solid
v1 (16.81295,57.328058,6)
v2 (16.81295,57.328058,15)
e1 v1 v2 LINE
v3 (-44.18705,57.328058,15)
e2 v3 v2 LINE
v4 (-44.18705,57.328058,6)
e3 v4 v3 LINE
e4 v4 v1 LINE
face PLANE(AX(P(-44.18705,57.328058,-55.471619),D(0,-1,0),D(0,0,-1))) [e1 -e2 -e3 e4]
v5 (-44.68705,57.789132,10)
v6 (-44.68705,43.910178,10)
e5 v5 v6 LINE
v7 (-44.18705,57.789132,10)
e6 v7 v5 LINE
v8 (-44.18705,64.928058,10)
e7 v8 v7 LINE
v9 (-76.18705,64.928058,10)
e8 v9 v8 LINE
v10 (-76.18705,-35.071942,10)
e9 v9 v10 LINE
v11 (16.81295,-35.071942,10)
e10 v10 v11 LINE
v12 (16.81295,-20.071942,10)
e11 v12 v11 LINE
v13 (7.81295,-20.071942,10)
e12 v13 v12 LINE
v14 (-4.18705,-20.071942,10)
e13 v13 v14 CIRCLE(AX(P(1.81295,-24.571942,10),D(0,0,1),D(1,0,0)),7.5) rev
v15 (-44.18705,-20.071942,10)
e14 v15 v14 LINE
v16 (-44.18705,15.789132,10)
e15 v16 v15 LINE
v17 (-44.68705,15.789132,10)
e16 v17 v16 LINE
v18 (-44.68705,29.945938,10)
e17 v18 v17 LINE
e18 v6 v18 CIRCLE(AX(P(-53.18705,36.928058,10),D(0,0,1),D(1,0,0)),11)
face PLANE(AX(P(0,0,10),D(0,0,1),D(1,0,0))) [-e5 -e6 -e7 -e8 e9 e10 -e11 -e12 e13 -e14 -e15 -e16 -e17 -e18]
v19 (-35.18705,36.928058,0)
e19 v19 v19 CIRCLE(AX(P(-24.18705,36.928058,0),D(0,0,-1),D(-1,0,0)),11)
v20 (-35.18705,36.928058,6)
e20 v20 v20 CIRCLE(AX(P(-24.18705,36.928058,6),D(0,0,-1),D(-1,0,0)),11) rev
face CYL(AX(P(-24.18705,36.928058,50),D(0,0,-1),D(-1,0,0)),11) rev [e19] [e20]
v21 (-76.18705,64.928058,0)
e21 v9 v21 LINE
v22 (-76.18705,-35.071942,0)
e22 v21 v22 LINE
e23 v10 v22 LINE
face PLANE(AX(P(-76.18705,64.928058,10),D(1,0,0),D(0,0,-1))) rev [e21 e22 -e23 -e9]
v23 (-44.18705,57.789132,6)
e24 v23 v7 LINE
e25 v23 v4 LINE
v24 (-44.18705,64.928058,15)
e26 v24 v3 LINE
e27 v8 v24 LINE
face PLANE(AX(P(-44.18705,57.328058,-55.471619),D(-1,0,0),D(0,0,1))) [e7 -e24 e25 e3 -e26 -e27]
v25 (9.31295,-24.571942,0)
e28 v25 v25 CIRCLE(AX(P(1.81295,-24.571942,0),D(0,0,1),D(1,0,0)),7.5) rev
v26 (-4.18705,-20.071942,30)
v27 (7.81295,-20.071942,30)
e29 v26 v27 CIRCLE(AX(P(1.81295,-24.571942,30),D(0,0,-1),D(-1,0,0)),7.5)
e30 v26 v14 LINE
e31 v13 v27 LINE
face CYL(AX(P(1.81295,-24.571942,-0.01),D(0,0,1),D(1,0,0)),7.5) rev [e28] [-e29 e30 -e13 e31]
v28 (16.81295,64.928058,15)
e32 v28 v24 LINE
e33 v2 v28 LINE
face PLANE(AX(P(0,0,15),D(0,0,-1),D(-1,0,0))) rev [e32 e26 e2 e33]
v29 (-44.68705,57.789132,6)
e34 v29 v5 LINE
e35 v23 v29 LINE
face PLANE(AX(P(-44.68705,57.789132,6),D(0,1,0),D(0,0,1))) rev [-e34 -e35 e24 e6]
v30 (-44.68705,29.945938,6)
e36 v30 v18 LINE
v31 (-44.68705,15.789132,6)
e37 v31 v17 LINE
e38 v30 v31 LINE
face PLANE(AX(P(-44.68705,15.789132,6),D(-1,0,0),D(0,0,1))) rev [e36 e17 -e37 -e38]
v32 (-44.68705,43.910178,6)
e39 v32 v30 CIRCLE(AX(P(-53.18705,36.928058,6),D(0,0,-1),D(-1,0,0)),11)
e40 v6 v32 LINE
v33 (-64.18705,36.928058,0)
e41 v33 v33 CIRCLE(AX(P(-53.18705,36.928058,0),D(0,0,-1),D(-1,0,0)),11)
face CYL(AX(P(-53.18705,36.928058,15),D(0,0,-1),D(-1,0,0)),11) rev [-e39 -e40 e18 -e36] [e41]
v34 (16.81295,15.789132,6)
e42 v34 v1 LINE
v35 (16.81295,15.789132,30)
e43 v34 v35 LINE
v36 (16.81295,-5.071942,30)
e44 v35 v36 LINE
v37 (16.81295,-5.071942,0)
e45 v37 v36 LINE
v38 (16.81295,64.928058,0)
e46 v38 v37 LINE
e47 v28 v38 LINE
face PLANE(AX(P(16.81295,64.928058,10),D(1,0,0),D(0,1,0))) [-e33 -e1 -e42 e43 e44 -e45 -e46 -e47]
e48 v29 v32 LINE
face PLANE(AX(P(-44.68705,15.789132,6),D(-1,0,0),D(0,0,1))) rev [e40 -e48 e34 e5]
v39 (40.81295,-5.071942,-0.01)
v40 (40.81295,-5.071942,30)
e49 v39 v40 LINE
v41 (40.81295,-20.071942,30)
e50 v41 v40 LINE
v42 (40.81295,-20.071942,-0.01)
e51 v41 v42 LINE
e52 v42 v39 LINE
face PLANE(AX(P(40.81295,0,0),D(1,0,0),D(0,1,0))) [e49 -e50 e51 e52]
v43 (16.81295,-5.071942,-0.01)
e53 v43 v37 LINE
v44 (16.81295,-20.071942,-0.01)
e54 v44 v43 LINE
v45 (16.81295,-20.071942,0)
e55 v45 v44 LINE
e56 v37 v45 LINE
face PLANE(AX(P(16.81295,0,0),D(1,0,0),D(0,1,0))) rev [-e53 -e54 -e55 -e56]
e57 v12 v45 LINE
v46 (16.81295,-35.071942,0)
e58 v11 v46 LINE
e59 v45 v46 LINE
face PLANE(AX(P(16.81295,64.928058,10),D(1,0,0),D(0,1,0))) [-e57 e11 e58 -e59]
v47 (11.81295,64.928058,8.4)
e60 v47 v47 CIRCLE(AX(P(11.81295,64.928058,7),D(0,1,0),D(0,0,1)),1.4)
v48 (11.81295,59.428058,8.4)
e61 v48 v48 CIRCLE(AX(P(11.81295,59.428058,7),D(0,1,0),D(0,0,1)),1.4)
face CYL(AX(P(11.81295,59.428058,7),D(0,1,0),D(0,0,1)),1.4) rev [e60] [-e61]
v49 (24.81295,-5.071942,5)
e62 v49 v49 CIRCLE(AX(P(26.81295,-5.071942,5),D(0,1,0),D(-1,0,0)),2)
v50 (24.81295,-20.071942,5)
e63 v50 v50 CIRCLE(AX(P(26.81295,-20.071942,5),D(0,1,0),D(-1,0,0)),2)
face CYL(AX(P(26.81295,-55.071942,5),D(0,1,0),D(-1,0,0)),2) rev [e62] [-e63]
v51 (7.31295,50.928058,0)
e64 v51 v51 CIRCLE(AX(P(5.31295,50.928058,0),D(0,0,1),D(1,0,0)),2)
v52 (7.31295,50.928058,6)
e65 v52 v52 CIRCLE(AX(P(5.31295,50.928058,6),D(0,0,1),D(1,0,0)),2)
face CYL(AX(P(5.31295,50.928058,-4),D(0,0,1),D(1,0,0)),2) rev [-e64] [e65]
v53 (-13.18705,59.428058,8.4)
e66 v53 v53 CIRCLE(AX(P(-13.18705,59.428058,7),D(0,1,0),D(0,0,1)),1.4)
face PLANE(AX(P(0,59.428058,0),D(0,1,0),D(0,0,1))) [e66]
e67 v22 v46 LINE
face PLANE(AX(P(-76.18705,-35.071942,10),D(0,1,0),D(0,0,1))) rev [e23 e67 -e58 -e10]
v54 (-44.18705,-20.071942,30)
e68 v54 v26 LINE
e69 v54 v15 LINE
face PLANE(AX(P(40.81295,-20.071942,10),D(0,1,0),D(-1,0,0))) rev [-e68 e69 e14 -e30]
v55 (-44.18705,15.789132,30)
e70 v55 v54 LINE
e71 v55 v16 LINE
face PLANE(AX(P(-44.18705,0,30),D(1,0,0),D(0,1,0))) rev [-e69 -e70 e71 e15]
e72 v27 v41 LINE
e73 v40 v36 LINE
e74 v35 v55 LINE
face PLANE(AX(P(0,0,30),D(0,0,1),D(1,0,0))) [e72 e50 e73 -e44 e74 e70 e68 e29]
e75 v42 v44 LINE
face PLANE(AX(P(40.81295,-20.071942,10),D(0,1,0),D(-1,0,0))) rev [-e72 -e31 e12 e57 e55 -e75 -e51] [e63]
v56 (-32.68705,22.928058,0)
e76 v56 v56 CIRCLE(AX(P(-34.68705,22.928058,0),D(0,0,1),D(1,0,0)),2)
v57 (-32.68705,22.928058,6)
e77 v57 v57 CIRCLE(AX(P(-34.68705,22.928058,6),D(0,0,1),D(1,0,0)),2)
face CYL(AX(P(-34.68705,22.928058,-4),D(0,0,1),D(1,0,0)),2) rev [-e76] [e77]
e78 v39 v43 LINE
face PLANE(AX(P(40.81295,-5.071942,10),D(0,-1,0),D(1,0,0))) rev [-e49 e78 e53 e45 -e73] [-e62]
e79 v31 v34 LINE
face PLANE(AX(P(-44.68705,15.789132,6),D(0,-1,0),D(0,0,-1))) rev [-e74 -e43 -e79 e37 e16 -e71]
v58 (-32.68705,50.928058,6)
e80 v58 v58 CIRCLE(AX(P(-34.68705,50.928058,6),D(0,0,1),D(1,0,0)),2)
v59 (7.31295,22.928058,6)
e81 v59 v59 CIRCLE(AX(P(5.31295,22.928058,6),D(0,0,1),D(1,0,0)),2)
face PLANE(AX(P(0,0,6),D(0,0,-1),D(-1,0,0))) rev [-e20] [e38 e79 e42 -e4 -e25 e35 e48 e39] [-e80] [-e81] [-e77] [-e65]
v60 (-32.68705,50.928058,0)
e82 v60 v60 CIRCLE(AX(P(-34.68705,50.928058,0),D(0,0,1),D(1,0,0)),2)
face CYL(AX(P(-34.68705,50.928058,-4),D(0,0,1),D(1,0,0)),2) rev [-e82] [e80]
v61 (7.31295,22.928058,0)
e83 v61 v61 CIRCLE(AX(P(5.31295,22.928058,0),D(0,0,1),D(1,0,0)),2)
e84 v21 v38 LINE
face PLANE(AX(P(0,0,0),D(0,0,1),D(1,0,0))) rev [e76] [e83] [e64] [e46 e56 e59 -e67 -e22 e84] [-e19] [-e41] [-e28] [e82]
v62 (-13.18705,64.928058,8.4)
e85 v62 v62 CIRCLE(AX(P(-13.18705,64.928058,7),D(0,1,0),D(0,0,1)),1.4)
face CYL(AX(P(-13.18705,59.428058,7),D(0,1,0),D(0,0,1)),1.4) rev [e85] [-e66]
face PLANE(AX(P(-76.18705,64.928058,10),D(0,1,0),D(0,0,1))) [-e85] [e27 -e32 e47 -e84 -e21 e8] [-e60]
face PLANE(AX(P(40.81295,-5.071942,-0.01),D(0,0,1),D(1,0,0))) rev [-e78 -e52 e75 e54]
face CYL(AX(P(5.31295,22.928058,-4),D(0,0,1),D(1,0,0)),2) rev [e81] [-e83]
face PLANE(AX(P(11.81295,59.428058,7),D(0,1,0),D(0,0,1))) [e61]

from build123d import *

# Parameters (mm, degrees)
SKETCH1_W                = 93
SKETCH1_H                = 100
BOSS_EXTRUDE2_DEPTH      = 10
SKETCH4_W                = 10.01
SKETCH4_H                = 15
BOSS_EXTRUDE4_DEPTH      = 24
SKETCH5_R                = 2
CUT_EXTRUDE1_DEPTH       = 50
SKETCH7_R                = 11
CUT_EXTRUDE3_DEPTH       = 50
SKETCH14_W               = 61.5
SKETCH14_H               = 42
CUT_EXTRUDE8_DEPTH       = 4
BOSS_EXTRUDE5_START      = -4
SKETCH16_W               = 61
SKETCH16_H               = 7.6
BOSS_EXTRUDE5_DEPTH      = 9
BOSS_EXTRUDE6_DEPTH      = 20
SKETCH19_R               = 11
CUT_EXTRUDE11_DEPTH      = 15
SKETCH20_R               = 2
CUT_EXTRUDE12_DEPTH      = 10
SKETCH8_R                = 1.4
CUT_EXTRUDE4_DEPTH       = 5.5
CUT_EXTRUDE13_DEPTH      = 103.078985596
CUT_EXTRUDE13_DEPTH_BACK = 103.078985596
SKETCH6_R                = 7.5


# Read off the part's stored shape, not the designer's step: Boss-Extrude6
with BuildPart() as part:
    # Sketch1 → Boss-Extrude2 (new body)
    with BuildSketch(Plane.XY):
        with Locations((-29.68705036, 14.928057554)):
            Rectangle(SKETCH1_W, SKETCH1_H)
    extrude(amount=BOSS_EXTRUDE2_DEPTH)

    # Sketch4 → Boss-Extrude4 (add)
    with BuildSketch(Plane(origin=(16.81294964, 0, 0), x_dir=(0, 0, -1), z_dir=(1, 0, 0))):
        with Locations((-4.995, -12.571942446)):
            Rectangle(SKETCH4_W, SKETCH4_H)
    extrude(amount=BOSS_EXTRUDE4_DEPTH)

    # Sketch5 → Cut-Extrude1 (cut)
    with BuildSketch(Plane(origin=(0, -5.071942446, 0), x_dir=(1, 0, 0), z_dir=(0, 1, 0))):
        with Locations(Location((26.81294964, -5, 0), (0, 0, 180))):
            Circle(SKETCH5_R)
    extrude(amount=-CUT_EXTRUDE1_DEPTH, mode=Mode.SUBTRACT)

    # Sketch7 → Cut-Extrude3 (cut)
    with BuildSketch(Plane(origin=(0, 0, 0), x_dir=(-1, 0, 0), z_dir=(0, 0, -1))):
        with Locations((24.18705036, 36.928057554)):
            Circle(SKETCH7_R)
    extrude(amount=-CUT_EXTRUDE3_DEPTH, mode=Mode.SUBTRACT)

    # Sketch14 → Cut-Extrude8 (cut)
    with BuildSketch(Plane.XY.offset(10)):
        with Locations((-13.93705036, 36.789132279)):
            Rectangle(SKETCH14_W, SKETCH14_H)
    extrude(amount=-CUT_EXTRUDE8_DEPTH, mode=Mode.SUBTRACT)

    # Sketch16 → Boss-Extrude5 (add)
    with BuildSketch(Plane.XY.offset(10).offset(BOSS_EXTRUDE5_START)):
        with Locations((-13.68705036, 61.128057554)):
            Rectangle(SKETCH16_W, SKETCH16_H)
    extrude(amount=BOSS_EXTRUDE5_DEPTH)

    # Boss-Extrude6 outline → Boss-Extrude6 (add)
    with BuildSketch(Plane.XY.offset(10)):
        Polygon((40.81294964, -5.071942446), (16.81294964, -5.071942446), (16.81294964, 15.789132279), (-44.18705036, 15.789132279), (-44.18705036, -20.071942446), (40.81294964, -20.071942446), align=None)
    extrude(amount=BOSS_EXTRUDE6_DEPTH)

    # Sketch19 → Cut-Extrude11 (cut)
    with BuildSketch(Plane(origin=(0, 0, 0), x_dir=(-1, 0, 0), z_dir=(0, 0, -1))):
        with Locations((53.18705036, 36.928057554)):
            Circle(SKETCH19_R)
    extrude(amount=-CUT_EXTRUDE11_DEPTH, mode=Mode.SUBTRACT)

    # Sketch20 → Cut-Extrude12 (cut)
    with BuildSketch(Plane.XY.offset(6)):
        with Locations((-34.68705036, 50.928057554)):
            Circle(SKETCH20_R)
        with Locations((5.31294964, 50.928057554)):
            Circle(SKETCH20_R)
        with Locations((-34.68705036, 22.928057554)):
            Circle(SKETCH20_R)
        with Locations((5.31294964, 22.928057554)):
            Circle(SKETCH20_R)
    extrude(amount=-CUT_EXTRUDE12_DEPTH, mode=Mode.SUBTRACT)

    # Sketch8 → Cut-Extrude4 (cut)
    with BuildSketch(Plane(origin=(0, 64.928057554, 0), x_dir=(1, 0, 0), z_dir=(0, 1, 0))):
        with Locations(Location((-13.18705036, -7, 0), (0, 0, 270))):
            Circle(SKETCH8_R)
        with Locations(Location((11.81294964, -7, 0), (0, 0, 270))):
            Circle(SKETCH8_R)
    extrude(amount=-CUT_EXTRUDE4_DEPTH, mode=Mode.SUBTRACT)

    # Sketch6 → Cut-Extrude13 (cut, two sides: drawn at the far end of the back side and taken through both)
    with BuildSketch(Plane(origin=(0, 0, 10), x_dir=(-1, 0, 0), z_dir=(0, 0, -1)).offset(-CUT_EXTRUDE13_DEPTH_BACK)):
        with Locations(Location((-1.81294964, -24.571942446, 0), (0, 0, 180))):
            Circle(SKETCH6_R)
    extrude(amount=CUT_EXTRUDE13_DEPTH + CUT_EXTRUDE13_DEPTH_BACK, mode=Mode.SUBTRACT)


solid = part.part
